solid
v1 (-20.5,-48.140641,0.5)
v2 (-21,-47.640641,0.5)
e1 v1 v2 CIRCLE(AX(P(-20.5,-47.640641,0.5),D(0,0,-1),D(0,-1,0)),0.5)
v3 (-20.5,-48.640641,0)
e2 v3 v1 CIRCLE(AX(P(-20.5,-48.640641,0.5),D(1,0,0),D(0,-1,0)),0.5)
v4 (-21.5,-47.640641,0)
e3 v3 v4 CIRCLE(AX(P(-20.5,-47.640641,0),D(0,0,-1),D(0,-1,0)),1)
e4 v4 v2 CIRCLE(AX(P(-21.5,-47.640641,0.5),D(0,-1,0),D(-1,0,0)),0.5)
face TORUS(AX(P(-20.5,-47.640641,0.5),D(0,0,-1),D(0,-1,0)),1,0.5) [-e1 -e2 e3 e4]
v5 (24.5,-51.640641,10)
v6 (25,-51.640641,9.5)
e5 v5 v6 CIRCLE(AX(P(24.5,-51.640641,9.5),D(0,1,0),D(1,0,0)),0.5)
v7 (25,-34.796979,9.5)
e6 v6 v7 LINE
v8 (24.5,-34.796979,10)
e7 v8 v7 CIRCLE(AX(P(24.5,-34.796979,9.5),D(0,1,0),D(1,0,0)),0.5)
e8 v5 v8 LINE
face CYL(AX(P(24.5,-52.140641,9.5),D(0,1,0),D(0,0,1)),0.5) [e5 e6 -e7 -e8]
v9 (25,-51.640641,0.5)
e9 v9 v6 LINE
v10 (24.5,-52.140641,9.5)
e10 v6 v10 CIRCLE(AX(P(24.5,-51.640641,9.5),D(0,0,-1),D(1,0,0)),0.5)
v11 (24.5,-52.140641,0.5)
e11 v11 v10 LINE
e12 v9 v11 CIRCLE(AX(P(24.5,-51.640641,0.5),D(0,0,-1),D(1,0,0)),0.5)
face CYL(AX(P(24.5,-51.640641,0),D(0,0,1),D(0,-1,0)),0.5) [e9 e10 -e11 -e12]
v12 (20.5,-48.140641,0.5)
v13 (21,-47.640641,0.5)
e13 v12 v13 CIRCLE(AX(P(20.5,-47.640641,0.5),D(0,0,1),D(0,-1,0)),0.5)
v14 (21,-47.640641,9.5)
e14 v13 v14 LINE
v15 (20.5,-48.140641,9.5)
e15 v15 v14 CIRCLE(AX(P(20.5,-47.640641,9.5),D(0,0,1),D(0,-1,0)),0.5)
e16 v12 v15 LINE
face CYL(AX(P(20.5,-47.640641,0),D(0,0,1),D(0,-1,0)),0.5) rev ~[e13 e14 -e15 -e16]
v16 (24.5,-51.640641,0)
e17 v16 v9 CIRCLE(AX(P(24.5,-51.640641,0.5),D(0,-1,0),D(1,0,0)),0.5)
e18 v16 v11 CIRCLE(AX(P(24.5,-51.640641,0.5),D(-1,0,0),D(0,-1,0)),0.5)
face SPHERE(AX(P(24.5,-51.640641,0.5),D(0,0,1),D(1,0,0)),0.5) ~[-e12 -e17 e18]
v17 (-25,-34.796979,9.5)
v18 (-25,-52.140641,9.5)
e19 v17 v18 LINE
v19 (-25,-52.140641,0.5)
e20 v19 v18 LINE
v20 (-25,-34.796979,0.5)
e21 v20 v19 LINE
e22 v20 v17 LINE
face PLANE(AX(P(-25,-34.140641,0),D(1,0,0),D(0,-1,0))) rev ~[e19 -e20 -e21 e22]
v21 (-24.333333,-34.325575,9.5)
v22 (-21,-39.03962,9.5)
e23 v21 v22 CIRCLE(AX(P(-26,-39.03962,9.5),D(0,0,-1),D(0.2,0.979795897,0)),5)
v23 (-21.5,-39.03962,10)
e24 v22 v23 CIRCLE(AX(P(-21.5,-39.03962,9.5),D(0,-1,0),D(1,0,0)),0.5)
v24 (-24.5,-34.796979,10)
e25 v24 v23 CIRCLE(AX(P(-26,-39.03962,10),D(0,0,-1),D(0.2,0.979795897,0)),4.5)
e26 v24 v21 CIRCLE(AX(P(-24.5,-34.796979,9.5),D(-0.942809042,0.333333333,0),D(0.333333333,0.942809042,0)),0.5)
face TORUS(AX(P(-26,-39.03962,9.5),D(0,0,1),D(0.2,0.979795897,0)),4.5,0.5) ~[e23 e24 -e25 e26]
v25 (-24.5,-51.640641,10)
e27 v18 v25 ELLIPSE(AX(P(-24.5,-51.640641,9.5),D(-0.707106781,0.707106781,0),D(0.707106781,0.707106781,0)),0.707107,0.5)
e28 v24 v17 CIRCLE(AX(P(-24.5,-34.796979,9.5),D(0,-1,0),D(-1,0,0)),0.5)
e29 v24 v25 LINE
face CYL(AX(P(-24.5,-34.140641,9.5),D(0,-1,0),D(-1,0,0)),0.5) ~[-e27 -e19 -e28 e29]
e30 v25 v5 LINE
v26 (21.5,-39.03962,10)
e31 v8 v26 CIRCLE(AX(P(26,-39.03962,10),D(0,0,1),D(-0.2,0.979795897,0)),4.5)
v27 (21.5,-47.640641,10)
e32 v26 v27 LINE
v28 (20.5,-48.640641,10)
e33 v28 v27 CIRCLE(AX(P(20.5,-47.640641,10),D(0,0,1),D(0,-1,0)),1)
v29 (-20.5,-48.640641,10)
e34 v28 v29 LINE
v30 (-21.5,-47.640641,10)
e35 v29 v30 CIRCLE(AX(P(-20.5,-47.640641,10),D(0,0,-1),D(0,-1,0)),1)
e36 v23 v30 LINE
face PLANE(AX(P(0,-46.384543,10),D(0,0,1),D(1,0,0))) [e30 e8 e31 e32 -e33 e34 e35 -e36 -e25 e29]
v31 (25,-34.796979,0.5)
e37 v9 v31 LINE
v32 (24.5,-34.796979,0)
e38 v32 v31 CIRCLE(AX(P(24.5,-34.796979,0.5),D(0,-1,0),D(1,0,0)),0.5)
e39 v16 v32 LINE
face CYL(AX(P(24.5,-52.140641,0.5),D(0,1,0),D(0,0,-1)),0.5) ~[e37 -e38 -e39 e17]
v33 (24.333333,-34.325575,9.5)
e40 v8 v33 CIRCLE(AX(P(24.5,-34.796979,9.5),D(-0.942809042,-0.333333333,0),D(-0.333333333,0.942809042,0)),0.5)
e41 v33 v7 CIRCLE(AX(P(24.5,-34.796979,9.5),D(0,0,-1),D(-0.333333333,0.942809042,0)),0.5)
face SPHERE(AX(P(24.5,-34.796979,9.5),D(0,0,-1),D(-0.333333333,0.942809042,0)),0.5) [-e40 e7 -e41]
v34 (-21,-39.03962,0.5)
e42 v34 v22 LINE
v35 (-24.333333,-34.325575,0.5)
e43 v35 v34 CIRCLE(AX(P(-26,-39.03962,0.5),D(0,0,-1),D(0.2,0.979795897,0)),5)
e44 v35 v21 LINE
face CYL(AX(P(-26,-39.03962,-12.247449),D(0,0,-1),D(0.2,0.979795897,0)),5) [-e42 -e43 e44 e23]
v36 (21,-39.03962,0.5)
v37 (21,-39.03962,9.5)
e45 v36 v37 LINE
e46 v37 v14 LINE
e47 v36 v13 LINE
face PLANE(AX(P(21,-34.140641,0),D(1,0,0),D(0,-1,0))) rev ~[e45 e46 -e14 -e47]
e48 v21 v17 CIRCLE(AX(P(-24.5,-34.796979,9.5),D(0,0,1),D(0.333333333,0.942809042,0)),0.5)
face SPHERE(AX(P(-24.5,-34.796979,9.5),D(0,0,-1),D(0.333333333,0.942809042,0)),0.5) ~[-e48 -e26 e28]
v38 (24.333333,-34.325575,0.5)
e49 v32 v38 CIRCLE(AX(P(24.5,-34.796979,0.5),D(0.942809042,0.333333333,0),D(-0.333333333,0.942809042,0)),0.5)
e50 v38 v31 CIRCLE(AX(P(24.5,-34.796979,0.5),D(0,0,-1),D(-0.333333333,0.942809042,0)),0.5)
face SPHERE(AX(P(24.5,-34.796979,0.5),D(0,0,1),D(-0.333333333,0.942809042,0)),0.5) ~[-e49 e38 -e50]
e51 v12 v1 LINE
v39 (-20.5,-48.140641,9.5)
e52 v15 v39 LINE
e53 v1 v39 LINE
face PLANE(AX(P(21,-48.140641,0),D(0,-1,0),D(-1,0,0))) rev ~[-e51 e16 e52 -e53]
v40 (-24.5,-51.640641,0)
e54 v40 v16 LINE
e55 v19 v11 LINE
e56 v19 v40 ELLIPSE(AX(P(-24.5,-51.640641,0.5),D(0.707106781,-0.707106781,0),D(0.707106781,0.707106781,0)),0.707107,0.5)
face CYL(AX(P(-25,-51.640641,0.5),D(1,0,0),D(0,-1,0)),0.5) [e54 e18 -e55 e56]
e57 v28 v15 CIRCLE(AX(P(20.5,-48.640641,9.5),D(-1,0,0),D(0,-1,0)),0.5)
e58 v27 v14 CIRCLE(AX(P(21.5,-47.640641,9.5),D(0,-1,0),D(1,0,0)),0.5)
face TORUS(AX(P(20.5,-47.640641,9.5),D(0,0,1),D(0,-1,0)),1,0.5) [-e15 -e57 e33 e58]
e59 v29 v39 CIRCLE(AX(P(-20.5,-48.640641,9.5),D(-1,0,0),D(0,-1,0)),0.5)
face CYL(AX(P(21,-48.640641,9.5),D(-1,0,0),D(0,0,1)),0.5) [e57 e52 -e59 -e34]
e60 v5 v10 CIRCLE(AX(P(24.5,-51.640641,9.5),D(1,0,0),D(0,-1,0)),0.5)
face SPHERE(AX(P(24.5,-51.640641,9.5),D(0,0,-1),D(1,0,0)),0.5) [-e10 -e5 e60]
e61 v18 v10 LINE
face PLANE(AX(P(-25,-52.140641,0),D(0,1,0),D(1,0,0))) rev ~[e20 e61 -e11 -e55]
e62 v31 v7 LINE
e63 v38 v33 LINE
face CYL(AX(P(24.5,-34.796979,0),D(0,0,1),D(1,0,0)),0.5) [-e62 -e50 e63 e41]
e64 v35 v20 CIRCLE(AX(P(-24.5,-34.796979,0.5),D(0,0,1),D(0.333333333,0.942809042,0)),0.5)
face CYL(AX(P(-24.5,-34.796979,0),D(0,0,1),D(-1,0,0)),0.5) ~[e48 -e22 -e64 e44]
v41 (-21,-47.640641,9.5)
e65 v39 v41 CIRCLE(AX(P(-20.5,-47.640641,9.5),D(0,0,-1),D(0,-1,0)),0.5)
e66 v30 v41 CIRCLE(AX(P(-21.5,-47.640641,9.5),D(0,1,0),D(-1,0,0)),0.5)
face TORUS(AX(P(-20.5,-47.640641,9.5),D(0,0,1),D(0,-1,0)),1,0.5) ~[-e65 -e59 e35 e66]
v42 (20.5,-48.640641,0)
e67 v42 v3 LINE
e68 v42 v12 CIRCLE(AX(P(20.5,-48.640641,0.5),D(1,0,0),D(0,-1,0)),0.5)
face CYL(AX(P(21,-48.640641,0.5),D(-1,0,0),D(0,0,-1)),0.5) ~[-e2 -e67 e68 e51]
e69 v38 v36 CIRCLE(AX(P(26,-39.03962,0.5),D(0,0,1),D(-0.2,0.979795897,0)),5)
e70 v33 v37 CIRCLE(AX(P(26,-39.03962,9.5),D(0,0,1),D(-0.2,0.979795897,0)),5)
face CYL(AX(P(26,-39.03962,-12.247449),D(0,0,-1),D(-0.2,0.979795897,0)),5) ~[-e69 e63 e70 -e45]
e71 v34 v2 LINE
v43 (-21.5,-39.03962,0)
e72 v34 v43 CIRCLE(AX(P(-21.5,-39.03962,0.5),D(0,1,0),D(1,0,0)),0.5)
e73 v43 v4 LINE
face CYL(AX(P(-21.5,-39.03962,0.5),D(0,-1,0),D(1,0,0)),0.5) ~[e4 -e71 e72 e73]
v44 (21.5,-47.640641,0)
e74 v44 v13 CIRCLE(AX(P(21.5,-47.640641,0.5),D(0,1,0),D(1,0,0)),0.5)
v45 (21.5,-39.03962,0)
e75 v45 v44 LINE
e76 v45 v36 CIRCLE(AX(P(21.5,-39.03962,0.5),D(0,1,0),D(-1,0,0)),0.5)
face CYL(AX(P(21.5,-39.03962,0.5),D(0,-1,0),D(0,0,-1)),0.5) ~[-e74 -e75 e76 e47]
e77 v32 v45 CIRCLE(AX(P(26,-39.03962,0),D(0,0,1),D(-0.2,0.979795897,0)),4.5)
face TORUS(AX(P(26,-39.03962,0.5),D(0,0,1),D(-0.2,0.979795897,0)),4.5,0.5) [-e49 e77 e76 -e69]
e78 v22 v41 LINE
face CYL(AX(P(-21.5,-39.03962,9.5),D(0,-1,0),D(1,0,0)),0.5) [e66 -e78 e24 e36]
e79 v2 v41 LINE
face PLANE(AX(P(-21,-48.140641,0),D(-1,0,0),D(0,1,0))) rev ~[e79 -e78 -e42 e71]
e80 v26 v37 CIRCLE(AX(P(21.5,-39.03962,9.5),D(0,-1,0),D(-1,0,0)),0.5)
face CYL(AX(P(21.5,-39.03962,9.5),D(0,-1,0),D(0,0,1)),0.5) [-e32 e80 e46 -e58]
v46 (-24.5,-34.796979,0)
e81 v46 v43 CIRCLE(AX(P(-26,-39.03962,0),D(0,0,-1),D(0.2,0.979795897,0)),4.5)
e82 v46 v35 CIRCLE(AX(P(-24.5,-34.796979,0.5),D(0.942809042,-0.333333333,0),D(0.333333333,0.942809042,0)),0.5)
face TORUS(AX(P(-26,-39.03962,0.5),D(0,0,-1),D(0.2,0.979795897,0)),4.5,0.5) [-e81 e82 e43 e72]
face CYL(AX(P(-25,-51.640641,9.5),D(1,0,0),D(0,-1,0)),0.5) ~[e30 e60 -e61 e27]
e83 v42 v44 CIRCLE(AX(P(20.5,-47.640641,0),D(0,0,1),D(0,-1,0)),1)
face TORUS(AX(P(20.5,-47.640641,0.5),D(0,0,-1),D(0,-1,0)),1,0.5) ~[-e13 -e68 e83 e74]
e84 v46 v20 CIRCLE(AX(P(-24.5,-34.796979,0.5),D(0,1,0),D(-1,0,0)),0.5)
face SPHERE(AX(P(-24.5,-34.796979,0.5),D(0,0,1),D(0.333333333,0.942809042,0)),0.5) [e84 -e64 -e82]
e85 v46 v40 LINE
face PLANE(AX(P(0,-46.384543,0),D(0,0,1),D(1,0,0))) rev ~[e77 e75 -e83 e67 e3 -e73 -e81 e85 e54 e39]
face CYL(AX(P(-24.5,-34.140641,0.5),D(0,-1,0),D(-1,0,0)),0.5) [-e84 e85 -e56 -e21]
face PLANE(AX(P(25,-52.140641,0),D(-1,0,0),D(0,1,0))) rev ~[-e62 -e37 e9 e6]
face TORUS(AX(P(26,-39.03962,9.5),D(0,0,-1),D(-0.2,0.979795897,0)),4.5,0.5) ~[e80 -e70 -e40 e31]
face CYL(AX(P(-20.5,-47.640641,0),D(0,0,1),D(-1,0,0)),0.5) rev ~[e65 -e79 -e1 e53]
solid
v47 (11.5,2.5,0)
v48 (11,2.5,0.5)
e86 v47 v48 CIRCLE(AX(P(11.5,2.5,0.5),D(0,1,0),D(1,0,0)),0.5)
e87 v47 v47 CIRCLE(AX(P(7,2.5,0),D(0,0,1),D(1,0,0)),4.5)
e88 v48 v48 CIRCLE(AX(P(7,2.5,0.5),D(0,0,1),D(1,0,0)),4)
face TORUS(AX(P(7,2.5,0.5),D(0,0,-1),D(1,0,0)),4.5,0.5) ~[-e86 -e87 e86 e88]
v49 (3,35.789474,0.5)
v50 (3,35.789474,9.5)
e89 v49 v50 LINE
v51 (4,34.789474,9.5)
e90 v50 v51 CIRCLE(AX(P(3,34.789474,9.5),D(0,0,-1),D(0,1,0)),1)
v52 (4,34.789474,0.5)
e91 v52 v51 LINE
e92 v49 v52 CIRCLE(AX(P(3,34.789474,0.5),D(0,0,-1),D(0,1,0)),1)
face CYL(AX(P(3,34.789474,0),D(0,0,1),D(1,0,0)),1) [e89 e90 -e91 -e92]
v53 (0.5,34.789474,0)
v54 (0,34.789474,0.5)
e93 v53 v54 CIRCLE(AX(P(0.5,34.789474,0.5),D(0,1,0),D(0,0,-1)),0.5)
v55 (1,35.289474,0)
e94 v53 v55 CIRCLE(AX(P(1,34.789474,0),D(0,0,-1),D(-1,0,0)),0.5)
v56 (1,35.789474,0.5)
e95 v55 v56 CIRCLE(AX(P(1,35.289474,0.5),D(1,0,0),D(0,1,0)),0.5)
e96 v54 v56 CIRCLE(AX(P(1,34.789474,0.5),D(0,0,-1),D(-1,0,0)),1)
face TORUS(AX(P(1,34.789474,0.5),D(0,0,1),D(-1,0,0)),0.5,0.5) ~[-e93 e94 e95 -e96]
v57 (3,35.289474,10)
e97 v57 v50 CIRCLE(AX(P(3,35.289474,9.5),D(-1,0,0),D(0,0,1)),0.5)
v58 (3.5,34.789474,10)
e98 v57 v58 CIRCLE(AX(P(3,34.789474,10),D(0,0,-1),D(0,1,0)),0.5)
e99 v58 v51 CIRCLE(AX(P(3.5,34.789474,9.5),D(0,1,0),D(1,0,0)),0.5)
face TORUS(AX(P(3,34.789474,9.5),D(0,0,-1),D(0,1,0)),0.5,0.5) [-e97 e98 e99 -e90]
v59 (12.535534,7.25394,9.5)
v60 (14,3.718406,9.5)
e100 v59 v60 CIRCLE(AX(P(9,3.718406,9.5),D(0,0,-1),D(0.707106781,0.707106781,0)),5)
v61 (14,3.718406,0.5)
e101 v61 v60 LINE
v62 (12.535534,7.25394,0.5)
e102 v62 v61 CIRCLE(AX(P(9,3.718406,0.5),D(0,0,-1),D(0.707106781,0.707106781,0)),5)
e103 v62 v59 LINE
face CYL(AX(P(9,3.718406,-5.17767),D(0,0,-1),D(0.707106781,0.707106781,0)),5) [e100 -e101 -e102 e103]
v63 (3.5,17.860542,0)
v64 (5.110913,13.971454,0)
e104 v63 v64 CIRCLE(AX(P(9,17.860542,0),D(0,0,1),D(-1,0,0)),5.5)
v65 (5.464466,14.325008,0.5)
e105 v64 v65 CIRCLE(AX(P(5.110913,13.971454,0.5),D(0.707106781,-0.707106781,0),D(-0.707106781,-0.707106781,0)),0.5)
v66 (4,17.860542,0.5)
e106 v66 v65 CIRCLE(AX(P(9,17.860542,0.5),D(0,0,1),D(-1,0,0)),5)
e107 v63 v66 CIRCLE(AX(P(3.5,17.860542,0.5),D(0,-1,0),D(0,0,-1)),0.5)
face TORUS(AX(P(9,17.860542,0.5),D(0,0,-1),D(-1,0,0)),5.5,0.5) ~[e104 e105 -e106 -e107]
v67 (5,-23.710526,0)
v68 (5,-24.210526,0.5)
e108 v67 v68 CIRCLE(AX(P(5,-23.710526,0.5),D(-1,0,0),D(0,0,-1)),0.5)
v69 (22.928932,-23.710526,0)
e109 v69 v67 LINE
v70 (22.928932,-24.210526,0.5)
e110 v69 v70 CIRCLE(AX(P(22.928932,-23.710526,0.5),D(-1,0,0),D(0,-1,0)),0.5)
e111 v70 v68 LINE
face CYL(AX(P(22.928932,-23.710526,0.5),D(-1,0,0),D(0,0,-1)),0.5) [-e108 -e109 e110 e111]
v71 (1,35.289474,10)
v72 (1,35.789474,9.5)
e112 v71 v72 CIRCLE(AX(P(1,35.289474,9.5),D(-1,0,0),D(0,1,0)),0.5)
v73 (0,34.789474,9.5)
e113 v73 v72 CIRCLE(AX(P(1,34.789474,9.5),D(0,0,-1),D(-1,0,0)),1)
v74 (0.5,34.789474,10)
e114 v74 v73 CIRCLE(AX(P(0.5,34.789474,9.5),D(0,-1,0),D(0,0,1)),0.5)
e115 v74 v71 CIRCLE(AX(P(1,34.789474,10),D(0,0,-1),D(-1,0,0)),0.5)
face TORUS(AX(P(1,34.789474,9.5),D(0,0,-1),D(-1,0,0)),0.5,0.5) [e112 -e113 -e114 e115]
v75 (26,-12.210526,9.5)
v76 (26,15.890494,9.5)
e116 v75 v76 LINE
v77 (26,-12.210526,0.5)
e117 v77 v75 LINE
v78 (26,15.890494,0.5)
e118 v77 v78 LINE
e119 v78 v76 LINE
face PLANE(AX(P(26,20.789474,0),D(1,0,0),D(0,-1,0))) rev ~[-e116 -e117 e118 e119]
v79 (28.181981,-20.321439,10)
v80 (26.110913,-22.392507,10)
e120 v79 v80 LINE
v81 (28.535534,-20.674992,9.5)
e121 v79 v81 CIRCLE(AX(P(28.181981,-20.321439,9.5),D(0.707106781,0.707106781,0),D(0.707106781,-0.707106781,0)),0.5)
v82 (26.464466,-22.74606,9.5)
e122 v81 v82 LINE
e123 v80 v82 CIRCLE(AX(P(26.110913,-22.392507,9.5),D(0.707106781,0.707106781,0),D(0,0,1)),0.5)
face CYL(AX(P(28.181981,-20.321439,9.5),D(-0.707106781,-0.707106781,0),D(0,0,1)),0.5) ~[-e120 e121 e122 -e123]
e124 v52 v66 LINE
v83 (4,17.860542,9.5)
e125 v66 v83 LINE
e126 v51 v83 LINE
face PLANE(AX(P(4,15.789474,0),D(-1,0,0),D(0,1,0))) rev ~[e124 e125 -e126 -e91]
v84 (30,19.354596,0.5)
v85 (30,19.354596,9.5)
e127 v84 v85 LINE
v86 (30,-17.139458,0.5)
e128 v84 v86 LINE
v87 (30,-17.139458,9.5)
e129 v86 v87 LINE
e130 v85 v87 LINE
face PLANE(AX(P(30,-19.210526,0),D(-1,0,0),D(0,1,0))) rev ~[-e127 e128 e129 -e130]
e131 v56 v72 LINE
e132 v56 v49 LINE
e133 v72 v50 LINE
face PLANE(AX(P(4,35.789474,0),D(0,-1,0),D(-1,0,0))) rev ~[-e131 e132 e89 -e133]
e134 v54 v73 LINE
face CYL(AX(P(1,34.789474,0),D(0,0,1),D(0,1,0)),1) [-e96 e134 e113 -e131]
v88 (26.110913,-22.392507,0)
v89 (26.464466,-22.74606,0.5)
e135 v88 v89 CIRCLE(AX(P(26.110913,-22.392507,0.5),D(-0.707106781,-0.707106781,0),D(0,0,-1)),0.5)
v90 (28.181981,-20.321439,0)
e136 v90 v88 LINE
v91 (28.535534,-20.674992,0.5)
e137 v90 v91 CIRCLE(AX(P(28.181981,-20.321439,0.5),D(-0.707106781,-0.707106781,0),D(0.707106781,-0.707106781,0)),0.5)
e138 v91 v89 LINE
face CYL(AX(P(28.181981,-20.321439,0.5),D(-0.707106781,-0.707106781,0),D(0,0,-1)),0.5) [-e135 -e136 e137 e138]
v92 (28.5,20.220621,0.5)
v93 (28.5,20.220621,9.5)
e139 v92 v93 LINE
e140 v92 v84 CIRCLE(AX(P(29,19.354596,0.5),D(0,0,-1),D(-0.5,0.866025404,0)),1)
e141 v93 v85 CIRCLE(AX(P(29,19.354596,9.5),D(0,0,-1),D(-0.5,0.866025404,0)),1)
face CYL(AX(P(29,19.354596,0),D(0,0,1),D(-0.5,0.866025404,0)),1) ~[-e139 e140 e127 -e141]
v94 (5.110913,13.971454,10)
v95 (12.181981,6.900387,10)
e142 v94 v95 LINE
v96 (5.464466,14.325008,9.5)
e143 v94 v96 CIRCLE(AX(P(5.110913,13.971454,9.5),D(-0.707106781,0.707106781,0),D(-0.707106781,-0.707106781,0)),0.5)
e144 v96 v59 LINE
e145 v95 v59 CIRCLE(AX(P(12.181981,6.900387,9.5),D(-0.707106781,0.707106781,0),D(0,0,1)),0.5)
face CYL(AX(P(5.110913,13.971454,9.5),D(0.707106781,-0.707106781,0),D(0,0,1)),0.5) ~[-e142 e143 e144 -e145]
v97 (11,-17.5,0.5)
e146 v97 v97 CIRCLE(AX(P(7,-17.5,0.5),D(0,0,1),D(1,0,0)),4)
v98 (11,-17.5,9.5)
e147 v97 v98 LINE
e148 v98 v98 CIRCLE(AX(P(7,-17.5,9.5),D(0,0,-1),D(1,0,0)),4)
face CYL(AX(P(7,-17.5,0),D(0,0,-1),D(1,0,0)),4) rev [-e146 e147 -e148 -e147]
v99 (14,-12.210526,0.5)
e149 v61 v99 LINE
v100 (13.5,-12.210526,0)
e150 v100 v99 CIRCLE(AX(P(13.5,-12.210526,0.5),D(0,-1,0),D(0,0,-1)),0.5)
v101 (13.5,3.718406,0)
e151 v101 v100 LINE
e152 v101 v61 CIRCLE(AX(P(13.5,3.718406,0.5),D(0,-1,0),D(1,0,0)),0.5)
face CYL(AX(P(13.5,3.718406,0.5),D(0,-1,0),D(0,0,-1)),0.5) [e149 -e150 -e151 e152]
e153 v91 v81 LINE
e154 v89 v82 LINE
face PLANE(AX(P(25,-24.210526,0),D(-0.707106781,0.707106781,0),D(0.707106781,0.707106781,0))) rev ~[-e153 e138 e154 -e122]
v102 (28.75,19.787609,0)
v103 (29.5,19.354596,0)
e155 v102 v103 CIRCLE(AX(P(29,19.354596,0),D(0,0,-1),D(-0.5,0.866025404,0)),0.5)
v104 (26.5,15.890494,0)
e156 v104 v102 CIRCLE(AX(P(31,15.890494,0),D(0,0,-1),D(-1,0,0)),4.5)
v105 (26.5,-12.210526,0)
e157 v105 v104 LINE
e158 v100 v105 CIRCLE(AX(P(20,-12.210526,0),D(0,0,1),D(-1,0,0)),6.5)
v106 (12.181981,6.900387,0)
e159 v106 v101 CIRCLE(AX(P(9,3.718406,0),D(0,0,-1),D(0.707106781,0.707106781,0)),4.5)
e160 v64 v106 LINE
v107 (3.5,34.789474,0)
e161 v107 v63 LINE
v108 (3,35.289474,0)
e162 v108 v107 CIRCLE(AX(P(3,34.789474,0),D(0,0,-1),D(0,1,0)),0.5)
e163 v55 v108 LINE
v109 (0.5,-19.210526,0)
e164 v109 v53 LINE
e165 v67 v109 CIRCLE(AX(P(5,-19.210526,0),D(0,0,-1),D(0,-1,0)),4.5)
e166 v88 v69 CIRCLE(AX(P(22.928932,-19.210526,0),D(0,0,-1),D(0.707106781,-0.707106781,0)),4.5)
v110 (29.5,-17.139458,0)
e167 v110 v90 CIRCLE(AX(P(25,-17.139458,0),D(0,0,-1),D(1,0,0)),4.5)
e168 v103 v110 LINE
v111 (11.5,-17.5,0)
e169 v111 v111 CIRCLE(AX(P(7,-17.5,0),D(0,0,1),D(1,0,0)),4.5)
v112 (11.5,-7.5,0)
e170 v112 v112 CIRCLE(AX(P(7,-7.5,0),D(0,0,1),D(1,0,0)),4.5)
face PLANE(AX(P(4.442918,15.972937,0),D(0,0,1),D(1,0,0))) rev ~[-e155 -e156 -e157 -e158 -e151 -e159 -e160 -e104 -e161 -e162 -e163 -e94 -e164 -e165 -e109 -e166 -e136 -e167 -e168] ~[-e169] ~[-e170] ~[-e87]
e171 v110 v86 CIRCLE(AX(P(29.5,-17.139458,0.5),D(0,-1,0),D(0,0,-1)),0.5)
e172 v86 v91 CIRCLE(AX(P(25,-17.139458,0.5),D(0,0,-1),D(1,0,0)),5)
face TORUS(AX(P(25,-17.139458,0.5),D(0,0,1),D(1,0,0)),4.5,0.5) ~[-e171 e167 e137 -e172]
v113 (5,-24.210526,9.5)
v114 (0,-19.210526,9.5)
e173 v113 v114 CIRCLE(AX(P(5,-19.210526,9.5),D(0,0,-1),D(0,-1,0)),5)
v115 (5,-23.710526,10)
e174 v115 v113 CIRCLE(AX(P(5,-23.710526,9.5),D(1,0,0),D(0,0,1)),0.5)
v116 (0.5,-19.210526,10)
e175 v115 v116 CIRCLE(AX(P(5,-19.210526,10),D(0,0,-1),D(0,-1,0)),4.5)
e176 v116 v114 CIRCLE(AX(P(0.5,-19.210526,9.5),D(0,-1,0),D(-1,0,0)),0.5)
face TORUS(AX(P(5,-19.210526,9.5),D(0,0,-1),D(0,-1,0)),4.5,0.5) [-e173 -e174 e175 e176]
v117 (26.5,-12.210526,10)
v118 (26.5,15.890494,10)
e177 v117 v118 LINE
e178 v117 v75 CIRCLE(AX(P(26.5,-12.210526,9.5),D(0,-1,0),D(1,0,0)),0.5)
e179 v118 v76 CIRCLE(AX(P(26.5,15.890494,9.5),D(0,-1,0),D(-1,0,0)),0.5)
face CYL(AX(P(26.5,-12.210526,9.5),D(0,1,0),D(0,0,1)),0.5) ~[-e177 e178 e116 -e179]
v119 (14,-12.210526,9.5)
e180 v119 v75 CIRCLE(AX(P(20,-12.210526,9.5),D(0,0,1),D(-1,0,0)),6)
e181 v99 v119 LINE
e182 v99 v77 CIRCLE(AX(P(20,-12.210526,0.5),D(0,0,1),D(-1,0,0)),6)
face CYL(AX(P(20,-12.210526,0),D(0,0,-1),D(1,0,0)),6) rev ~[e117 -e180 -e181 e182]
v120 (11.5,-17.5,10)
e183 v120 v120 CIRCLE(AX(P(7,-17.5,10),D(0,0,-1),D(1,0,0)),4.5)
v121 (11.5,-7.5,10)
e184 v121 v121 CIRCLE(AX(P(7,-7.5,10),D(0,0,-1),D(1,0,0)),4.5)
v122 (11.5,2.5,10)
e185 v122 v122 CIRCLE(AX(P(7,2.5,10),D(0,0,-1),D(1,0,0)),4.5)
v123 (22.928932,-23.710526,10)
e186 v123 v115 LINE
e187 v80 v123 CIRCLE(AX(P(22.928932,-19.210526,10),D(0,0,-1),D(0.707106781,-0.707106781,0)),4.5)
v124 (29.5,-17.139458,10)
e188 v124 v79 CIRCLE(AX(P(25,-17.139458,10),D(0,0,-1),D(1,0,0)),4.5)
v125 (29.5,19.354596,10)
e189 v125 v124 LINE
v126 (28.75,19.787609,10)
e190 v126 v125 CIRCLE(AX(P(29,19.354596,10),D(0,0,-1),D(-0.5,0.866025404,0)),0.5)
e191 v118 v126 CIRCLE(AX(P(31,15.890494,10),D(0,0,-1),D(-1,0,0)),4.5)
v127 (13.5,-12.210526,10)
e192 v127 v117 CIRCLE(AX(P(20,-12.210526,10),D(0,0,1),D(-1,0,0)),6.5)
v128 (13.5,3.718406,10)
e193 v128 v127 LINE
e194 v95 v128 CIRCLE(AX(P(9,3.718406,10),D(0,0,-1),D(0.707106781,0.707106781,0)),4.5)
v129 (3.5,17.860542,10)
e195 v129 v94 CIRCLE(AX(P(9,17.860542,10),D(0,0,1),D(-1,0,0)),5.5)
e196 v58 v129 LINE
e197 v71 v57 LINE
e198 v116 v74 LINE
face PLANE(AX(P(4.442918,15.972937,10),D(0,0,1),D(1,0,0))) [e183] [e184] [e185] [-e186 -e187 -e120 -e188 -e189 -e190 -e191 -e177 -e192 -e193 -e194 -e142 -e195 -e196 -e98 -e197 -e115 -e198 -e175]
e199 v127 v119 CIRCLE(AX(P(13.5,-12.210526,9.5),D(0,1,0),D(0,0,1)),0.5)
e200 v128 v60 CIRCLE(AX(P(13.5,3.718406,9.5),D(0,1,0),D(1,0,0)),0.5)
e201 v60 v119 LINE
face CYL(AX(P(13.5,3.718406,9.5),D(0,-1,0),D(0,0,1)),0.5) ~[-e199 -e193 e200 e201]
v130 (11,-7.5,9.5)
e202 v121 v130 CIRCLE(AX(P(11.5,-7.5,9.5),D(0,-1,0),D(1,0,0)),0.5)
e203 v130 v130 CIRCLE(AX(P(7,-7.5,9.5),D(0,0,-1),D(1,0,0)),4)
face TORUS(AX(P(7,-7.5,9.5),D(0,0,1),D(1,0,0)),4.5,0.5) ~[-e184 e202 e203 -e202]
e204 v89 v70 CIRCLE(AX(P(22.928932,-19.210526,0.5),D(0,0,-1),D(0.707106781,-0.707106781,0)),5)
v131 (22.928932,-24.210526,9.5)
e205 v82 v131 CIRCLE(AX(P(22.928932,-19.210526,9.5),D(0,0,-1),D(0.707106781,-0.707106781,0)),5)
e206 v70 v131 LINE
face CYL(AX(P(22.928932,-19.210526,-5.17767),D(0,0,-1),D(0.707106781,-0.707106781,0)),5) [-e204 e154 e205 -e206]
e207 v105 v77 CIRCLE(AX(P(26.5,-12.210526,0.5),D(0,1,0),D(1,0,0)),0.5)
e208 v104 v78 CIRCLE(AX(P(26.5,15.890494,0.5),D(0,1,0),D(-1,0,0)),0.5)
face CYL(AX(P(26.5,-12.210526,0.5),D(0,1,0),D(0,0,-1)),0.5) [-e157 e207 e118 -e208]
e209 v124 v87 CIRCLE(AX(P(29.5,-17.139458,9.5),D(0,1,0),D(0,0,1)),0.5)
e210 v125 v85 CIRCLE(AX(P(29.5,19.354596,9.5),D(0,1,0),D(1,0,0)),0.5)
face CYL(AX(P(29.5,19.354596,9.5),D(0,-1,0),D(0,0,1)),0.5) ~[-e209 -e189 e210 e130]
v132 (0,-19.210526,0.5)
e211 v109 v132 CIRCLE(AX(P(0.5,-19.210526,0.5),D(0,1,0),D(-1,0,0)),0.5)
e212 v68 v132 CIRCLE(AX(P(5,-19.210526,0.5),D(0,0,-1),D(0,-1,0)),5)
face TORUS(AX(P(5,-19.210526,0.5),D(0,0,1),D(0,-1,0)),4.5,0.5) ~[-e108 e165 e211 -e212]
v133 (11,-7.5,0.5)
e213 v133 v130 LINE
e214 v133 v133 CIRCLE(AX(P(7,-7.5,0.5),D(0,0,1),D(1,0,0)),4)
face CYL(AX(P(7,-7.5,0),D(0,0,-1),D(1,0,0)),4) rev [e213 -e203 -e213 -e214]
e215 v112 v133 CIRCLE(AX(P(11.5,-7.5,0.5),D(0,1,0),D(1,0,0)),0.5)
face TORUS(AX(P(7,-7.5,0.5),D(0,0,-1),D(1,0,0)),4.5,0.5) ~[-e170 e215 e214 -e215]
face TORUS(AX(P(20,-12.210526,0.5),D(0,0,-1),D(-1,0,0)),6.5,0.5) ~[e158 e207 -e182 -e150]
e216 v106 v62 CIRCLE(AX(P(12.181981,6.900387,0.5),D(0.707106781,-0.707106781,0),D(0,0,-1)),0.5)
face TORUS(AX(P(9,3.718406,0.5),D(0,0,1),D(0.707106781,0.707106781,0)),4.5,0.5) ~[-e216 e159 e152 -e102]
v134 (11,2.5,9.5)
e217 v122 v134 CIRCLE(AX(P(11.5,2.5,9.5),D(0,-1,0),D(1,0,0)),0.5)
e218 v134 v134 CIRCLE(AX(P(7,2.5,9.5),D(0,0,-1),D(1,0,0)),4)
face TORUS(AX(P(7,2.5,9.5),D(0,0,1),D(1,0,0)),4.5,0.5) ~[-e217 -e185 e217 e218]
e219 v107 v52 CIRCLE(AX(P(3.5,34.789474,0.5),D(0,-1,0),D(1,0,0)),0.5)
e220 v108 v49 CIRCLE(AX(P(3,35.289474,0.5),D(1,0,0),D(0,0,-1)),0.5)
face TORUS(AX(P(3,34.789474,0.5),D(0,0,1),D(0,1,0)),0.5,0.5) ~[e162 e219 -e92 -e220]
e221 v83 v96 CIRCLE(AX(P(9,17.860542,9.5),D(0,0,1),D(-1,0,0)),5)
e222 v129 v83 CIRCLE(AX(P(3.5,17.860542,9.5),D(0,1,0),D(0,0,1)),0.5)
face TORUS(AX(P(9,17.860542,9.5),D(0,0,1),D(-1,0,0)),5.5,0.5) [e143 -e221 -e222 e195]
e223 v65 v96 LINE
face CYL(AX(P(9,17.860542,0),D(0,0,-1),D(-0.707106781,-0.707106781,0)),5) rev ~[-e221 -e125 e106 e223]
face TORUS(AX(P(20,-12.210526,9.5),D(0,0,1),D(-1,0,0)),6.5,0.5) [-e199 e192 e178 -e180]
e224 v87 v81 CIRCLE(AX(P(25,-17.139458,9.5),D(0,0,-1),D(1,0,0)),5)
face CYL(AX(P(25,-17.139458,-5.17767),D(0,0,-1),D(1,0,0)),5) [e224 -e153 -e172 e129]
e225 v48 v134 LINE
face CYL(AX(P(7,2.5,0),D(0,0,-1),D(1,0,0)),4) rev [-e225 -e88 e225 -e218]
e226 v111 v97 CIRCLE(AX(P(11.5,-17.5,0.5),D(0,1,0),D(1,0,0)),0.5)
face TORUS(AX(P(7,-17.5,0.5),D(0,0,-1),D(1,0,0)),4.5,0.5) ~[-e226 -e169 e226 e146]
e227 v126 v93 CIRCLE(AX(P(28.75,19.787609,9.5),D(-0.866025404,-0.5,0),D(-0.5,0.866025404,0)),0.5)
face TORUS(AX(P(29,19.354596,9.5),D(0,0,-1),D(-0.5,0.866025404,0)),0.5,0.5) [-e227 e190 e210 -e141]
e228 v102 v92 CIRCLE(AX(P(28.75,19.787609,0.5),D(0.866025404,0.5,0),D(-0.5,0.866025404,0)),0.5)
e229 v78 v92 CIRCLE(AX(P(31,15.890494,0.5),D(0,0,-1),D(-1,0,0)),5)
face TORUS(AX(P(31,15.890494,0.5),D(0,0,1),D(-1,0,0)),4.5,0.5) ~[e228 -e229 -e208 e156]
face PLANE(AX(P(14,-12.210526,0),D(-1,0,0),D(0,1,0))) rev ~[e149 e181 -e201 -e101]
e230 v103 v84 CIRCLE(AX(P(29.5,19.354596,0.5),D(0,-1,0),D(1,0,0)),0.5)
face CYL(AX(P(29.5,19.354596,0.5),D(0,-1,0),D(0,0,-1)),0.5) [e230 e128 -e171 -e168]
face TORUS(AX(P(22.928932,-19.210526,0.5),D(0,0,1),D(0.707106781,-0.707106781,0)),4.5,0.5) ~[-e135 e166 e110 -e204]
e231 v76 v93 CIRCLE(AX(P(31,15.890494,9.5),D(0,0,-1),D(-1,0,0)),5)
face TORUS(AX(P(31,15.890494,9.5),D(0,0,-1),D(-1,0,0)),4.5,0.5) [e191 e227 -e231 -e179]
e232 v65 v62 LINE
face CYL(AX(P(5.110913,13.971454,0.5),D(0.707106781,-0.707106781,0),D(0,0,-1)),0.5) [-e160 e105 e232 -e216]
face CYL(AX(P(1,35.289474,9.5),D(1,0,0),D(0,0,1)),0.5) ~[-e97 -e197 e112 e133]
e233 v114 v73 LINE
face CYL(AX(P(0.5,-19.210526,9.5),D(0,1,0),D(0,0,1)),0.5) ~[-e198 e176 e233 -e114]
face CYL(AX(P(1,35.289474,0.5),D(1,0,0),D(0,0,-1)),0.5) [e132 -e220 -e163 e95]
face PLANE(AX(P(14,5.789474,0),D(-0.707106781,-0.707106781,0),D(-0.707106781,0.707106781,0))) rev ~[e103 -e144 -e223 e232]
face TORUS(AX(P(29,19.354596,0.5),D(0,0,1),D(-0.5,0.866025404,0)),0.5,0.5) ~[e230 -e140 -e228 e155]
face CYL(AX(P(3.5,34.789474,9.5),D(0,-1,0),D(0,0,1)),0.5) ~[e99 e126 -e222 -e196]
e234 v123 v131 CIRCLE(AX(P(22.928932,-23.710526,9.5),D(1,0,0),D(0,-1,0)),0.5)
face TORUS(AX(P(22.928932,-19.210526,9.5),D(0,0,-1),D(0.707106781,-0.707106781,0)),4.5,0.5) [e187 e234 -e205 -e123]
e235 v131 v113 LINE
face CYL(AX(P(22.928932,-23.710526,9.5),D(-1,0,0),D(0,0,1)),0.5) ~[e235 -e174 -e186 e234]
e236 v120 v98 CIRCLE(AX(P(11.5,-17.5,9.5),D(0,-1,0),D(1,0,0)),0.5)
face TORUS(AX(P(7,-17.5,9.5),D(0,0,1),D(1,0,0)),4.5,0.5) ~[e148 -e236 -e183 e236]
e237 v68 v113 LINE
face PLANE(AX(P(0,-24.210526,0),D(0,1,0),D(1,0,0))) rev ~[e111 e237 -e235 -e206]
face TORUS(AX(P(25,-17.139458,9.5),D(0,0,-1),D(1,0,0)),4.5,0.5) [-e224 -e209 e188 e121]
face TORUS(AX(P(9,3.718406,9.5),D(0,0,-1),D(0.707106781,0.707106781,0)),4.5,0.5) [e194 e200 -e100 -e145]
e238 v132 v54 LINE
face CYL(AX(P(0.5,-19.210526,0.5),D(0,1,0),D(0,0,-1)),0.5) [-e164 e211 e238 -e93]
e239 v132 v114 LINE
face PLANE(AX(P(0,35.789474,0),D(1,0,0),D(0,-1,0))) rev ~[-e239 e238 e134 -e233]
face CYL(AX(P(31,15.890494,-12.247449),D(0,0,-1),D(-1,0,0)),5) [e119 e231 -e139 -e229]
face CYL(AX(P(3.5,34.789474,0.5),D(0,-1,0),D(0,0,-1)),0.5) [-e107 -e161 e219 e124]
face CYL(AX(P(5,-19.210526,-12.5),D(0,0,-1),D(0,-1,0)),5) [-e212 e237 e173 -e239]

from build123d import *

# Parameters (mm, degrees)
F1_DEPTH     = 10
F2_T1_DEPTH  = 10
F2_T3_DEPTH  = 34.4948974279
F2_T5_DEPTH  = 20.3553390593
F2_T7_DEPTH  = 35
F2_T9_DEPTH  = 20.3553390593
F2_T11_DEPTH = 20.3553390593
F3_R         = 1
F4_R         = 4
F5_DEPTH     = 25
F7_R         = 0.5
F9_DEPTH     = 10
F10_T1_DEPTH = 34.4948974279
F11_R        = 0.5


# Not quite as in the source:
# - a fillet or chamfer that OpenCascade refuses, or shapes differently, is made with other operations: its cross-section is extruded or revolved along the edge and cut away or added
# - a feature names something its author has since deleted; it is built from what else it names


with BuildPart() as f1:
    # F0 (on Top) → F1 (new body)
    with BuildSketch(Plane.XY):
        with BuildLine():
            Line((4, 35.789473919), (0, 35.789473919))
            Line((0, 35.789473919), (0, -24.210526081))
            Line((0, -24.210526081), (25, -24.210526081))
            Line((25, -24.210526081), (30, -19.210526081))
            Line((30, -19.210526081), (30, 20.789473919))
            Line((30, 20.789473919), (26, 20.789473919))
            Line((26, 20.789473919), (26, -12.210526081))
            ThreePointArc((26, -12.210526081), (20, -18.210526081), (14, -12.210526081))
            Line((14, -12.210526081), (14, 5.789473919))
            Line((14, 5.789473919), (4, 15.789473919))
            Line((4, 15.789473919), (4, 35.789473919))
        make_face()
    extrude(amount=F1_DEPTH)

    # F2: fillet of radius 5 on 6 edges, made by hand

    # F2_s2 → F2_t1 (join)
    with BuildSketch(Plane.XY):
        with BuildLine():
            ThreePointArc((5.4644660941, 14.325007825), (4.3806023374, 15.9471245691), (4, 17.8605417309))
            Line((4, 17.8605417309), (4, 15.789473919))
            Line((4, 15.789473919), (5.4644660941, 14.325007825))
        make_face()
    extrude(amount=F2_T1_DEPTH)

    # F2_s4 → F2_t3 (cut)
    with BuildSketch(Plane.XY.offset(-12.2474487139)):
        with BuildLine():
            ThreePointArc((26, 15.8904944335), (27.1270166538, 19.0527720936), (30, 20.789473919))
            Line((30, 20.789473919), (26, 20.789473919))
            Line((26, 20.789473919), (26, 15.8904944335))
        make_face()
    extrude(amount=F2_T3_DEPTH, mode=Mode.SUBTRACT)

    # F2_s6 → F2_t5 (cut)
    with BuildSketch(Plane.XY.offset(-5.1776695297)):
        with BuildLine():
            ThreePointArc((12.5355339059, 7.2539400131), (13.6193976626, 5.631823269), (14, 3.7184061072))
            Line((14, 3.7184061072), (14, 5.789473919))
            Line((14, 5.789473919), (12.5355339059, 7.2539400131))
        make_face()
    extrude(amount=F2_T5_DEPTH, mode=Mode.SUBTRACT)

    # F2_s8 → F2_t7 (cut)
    with BuildSketch(Plane.XY.offset(-12.5)):
        with BuildLine():
            ThreePointArc((5, -24.210526081), (1.4644660941, -22.7460599869), (0, -19.210526081))
            Line((0, -19.210526081), (0, -24.210526081))
            Line((0, -24.210526081), (5, -24.210526081))
        make_face()
    extrude(amount=F2_T7_DEPTH, mode=Mode.SUBTRACT)

    # F2_s10 → F2_t9 (cut)
    with BuildSketch(Plane.XY.offset(-5.1776695297)):
        with BuildLine():
            ThreePointArc((26.4644660941, -22.7460599869), (24.84234935, -23.8299237435), (22.9289321881, -24.210526081))
            Line((22.9289321881, -24.210526081), (25, -24.210526081))
            Line((25, -24.210526081), (26.4644660941, -22.7460599869))
        make_face()
    extrude(amount=F2_T9_DEPTH, mode=Mode.SUBTRACT)

    # F2_s12 → F2_t11 (cut)
    with BuildSketch(Plane.XY.offset(-5.1776695297)):
        with BuildLine():
            ThreePointArc((30, -17.1394582691), (29.6193976626, -19.0528754309), (28.5355339059, -20.674992175))
            Line((28.5355339059, -20.674992175), (30, -19.210526081))
            Line((30, -19.210526081), (30, -17.1394582691))
        make_face()
    extrude(amount=F2_T11_DEPTH, mode=Mode.SUBTRACT)

    # F3
    f3_edges = [f1.edges().sort_by_distance(p)[0] for p in [
        (30, 20.789474, 5),
        (0, 35.789474, 5),
        (4, 35.789474, 5),
    ]]
    fillet(f3_edges, radius=F3_R)


with BuildPart() as f5:
    # F4 (on Top) → F5 (new body)
    with BuildSketch(Plane.XY):
        with Locations((7, 2.5)):
            Circle(F4_R)
    extrude(amount=F5_DEPTH)


with BuildPart() as f5b:
    # F4 (on Top) → F5, piece 2 (new body)
    with BuildSketch(Plane.XY):
        with Locations((7, -7.5)):
            Circle(F4_R)
    extrude(amount=F5_DEPTH)


with BuildPart() as f5c:
    # F4 (on Top) → F5, piece 3 (new body)
    with BuildSketch(Plane.XY):
        with Locations((7, -17.5)):
            Circle(F4_R)
    extrude(amount=F5_DEPTH)


with BuildPart() as f1_1:
    add(f1.part)

    # F6: cut F5c, F5b, F5
    add(f5c.part, mode=Mode.SUBTRACT)
    add(f5b.part, mode=Mode.SUBTRACT)
    add(f5.part, mode=Mode.SUBTRACT)

    # F7
    f7_edges = [f1_1.edges().sort_by_distance(p)[0] for p in [
        (3, -17.5, 10),
        (3, -7.5, 10),
        (3, 2.5, 10),
        (3, 2.5, 0),
        (3, -7.5, 0),
        (3, -17.5, 0),
        (26.669873, 18.390494, 0),
        (29.5, 20.220621, 0),
        (26, 1.839984, 0),
        (30, 1.107569, 0),
        (20, -18.210526, 0),
        (29.619398, -19.052875, 0),
        (14, -4.24606, 0),
        (27.5, -21.710526, 0),
        (13.619398, 5.631823, 0),
        (24.842349, -23.829924, 0),
        (9, 10.789474, 0),
        (13.964466, -24.210526, 0),
        (4.380602, 15.947125, 0),
        (1.464466, -22.74606, 0),
        (4, 26.325008, 0),
        (0, 7.789474, 0),
        (3.707107, 35.496581, 0),
        (0.292893, 35.496581, 0),
        (2, 35.789474, 0),
        (26.669873, 18.390494, 10),
        (29.5, 20.220621, 10),
        (26, 1.839984, 10),
        (30, 1.107569, 10),
        (20, -18.210526, 10),
        (29.619398, -19.052875, 10),
        (14, -4.24606, 10),
        (27.5, -21.710526, 10),
        (13.619398, 5.631823, 10),
        (24.842349, -23.829924, 10),
        (9, 10.789474, 10),
        (13.964466, -24.210526, 10),
        (4.380602, 15.947125, 10),
        (1.464466, -22.74606, 10),
        (4, 26.325008, 10),
        (0, 7.789474, 10),
        (3.707107, 35.496581, 10),
        (0.292893, 35.496581, 10),
        (2, 35.789474, 10),
    ]]
    fillet(f7_edges, radius=F7_R)


with BuildPart() as f9:
    # F8 (on Top) → F9 (new body)
    with BuildSketch(Plane.XY):
        Polygon((-21, -34.1406405903), (-25, -34.1406405903), (-25, -52.1406405903), (25, -52.1406405903), (25, -34.1406405903), (21, -34.1406405903), (21, -48.1406405903), (-21, -48.1406405903), align=None)
    extrude(amount=F9_DEPTH)

    # F10: fillet of radius 5 on 2 edges, made by hand

    # F10_s2 → F10_t1 (cut)
    with BuildSketch(Plane.XY.offset(-12.2474487139)):
        with BuildLine():
            ThreePointArc((25, -34.1406405903), (22.1270166538, -35.8773424157), (21, -39.0396200759))
            Line((21, -39.0396200759), (21, -34.1406405903))
            Line((21, -34.1406405903), (25, -34.1406405903))
        make_face()
        with BuildLine():
            ThreePointArc((-25, -34.1406405903), (-22.1270166538, -35.8773424157), (-21, -39.0396200759))
            Line((-21, -39.0396200759), (-21, -34.1406405903))
            Line((-21, -34.1406405903), (-25, -34.1406405903))
        make_face()
    extrude(amount=F10_T1_DEPTH, mode=Mode.SUBTRACT)

    # F11
    f11_edges = [f9.edges().sort_by_distance(p)[0] for p in [
        (25, -52.140641, 5),
        (25, -34.140641, 5),
        (-25, -34.140641, 5),
        (0, -48.140641, 10),
        (0, -48.140641, 0),
        (-22.127017, -35.877342, 10),
        (-21, -43.59013, 10),
        (21, -43.59013, 10),
        (22.127017, -35.877342, 10),
        (25, -43.140641, 10),
        (0, -52.140641, 10),
        (-25, -43.140641, 10),
        (-22.127017, -35.877342, 0),
        (-21, -43.59013, 0),
        (21, -43.59013, 0),
        (22.127017, -35.877342, 0),
        (25, -43.140641, 0),
        (0, -52.140641, 0),
        (-25, -43.140641, 0),
        (-21, -48.140641, 5),
        (21, -48.140641, 5),
    ]]
    fillet(f11_edges, radius=F11_R)


solid = Compound([f1_1.part, f9.part])
